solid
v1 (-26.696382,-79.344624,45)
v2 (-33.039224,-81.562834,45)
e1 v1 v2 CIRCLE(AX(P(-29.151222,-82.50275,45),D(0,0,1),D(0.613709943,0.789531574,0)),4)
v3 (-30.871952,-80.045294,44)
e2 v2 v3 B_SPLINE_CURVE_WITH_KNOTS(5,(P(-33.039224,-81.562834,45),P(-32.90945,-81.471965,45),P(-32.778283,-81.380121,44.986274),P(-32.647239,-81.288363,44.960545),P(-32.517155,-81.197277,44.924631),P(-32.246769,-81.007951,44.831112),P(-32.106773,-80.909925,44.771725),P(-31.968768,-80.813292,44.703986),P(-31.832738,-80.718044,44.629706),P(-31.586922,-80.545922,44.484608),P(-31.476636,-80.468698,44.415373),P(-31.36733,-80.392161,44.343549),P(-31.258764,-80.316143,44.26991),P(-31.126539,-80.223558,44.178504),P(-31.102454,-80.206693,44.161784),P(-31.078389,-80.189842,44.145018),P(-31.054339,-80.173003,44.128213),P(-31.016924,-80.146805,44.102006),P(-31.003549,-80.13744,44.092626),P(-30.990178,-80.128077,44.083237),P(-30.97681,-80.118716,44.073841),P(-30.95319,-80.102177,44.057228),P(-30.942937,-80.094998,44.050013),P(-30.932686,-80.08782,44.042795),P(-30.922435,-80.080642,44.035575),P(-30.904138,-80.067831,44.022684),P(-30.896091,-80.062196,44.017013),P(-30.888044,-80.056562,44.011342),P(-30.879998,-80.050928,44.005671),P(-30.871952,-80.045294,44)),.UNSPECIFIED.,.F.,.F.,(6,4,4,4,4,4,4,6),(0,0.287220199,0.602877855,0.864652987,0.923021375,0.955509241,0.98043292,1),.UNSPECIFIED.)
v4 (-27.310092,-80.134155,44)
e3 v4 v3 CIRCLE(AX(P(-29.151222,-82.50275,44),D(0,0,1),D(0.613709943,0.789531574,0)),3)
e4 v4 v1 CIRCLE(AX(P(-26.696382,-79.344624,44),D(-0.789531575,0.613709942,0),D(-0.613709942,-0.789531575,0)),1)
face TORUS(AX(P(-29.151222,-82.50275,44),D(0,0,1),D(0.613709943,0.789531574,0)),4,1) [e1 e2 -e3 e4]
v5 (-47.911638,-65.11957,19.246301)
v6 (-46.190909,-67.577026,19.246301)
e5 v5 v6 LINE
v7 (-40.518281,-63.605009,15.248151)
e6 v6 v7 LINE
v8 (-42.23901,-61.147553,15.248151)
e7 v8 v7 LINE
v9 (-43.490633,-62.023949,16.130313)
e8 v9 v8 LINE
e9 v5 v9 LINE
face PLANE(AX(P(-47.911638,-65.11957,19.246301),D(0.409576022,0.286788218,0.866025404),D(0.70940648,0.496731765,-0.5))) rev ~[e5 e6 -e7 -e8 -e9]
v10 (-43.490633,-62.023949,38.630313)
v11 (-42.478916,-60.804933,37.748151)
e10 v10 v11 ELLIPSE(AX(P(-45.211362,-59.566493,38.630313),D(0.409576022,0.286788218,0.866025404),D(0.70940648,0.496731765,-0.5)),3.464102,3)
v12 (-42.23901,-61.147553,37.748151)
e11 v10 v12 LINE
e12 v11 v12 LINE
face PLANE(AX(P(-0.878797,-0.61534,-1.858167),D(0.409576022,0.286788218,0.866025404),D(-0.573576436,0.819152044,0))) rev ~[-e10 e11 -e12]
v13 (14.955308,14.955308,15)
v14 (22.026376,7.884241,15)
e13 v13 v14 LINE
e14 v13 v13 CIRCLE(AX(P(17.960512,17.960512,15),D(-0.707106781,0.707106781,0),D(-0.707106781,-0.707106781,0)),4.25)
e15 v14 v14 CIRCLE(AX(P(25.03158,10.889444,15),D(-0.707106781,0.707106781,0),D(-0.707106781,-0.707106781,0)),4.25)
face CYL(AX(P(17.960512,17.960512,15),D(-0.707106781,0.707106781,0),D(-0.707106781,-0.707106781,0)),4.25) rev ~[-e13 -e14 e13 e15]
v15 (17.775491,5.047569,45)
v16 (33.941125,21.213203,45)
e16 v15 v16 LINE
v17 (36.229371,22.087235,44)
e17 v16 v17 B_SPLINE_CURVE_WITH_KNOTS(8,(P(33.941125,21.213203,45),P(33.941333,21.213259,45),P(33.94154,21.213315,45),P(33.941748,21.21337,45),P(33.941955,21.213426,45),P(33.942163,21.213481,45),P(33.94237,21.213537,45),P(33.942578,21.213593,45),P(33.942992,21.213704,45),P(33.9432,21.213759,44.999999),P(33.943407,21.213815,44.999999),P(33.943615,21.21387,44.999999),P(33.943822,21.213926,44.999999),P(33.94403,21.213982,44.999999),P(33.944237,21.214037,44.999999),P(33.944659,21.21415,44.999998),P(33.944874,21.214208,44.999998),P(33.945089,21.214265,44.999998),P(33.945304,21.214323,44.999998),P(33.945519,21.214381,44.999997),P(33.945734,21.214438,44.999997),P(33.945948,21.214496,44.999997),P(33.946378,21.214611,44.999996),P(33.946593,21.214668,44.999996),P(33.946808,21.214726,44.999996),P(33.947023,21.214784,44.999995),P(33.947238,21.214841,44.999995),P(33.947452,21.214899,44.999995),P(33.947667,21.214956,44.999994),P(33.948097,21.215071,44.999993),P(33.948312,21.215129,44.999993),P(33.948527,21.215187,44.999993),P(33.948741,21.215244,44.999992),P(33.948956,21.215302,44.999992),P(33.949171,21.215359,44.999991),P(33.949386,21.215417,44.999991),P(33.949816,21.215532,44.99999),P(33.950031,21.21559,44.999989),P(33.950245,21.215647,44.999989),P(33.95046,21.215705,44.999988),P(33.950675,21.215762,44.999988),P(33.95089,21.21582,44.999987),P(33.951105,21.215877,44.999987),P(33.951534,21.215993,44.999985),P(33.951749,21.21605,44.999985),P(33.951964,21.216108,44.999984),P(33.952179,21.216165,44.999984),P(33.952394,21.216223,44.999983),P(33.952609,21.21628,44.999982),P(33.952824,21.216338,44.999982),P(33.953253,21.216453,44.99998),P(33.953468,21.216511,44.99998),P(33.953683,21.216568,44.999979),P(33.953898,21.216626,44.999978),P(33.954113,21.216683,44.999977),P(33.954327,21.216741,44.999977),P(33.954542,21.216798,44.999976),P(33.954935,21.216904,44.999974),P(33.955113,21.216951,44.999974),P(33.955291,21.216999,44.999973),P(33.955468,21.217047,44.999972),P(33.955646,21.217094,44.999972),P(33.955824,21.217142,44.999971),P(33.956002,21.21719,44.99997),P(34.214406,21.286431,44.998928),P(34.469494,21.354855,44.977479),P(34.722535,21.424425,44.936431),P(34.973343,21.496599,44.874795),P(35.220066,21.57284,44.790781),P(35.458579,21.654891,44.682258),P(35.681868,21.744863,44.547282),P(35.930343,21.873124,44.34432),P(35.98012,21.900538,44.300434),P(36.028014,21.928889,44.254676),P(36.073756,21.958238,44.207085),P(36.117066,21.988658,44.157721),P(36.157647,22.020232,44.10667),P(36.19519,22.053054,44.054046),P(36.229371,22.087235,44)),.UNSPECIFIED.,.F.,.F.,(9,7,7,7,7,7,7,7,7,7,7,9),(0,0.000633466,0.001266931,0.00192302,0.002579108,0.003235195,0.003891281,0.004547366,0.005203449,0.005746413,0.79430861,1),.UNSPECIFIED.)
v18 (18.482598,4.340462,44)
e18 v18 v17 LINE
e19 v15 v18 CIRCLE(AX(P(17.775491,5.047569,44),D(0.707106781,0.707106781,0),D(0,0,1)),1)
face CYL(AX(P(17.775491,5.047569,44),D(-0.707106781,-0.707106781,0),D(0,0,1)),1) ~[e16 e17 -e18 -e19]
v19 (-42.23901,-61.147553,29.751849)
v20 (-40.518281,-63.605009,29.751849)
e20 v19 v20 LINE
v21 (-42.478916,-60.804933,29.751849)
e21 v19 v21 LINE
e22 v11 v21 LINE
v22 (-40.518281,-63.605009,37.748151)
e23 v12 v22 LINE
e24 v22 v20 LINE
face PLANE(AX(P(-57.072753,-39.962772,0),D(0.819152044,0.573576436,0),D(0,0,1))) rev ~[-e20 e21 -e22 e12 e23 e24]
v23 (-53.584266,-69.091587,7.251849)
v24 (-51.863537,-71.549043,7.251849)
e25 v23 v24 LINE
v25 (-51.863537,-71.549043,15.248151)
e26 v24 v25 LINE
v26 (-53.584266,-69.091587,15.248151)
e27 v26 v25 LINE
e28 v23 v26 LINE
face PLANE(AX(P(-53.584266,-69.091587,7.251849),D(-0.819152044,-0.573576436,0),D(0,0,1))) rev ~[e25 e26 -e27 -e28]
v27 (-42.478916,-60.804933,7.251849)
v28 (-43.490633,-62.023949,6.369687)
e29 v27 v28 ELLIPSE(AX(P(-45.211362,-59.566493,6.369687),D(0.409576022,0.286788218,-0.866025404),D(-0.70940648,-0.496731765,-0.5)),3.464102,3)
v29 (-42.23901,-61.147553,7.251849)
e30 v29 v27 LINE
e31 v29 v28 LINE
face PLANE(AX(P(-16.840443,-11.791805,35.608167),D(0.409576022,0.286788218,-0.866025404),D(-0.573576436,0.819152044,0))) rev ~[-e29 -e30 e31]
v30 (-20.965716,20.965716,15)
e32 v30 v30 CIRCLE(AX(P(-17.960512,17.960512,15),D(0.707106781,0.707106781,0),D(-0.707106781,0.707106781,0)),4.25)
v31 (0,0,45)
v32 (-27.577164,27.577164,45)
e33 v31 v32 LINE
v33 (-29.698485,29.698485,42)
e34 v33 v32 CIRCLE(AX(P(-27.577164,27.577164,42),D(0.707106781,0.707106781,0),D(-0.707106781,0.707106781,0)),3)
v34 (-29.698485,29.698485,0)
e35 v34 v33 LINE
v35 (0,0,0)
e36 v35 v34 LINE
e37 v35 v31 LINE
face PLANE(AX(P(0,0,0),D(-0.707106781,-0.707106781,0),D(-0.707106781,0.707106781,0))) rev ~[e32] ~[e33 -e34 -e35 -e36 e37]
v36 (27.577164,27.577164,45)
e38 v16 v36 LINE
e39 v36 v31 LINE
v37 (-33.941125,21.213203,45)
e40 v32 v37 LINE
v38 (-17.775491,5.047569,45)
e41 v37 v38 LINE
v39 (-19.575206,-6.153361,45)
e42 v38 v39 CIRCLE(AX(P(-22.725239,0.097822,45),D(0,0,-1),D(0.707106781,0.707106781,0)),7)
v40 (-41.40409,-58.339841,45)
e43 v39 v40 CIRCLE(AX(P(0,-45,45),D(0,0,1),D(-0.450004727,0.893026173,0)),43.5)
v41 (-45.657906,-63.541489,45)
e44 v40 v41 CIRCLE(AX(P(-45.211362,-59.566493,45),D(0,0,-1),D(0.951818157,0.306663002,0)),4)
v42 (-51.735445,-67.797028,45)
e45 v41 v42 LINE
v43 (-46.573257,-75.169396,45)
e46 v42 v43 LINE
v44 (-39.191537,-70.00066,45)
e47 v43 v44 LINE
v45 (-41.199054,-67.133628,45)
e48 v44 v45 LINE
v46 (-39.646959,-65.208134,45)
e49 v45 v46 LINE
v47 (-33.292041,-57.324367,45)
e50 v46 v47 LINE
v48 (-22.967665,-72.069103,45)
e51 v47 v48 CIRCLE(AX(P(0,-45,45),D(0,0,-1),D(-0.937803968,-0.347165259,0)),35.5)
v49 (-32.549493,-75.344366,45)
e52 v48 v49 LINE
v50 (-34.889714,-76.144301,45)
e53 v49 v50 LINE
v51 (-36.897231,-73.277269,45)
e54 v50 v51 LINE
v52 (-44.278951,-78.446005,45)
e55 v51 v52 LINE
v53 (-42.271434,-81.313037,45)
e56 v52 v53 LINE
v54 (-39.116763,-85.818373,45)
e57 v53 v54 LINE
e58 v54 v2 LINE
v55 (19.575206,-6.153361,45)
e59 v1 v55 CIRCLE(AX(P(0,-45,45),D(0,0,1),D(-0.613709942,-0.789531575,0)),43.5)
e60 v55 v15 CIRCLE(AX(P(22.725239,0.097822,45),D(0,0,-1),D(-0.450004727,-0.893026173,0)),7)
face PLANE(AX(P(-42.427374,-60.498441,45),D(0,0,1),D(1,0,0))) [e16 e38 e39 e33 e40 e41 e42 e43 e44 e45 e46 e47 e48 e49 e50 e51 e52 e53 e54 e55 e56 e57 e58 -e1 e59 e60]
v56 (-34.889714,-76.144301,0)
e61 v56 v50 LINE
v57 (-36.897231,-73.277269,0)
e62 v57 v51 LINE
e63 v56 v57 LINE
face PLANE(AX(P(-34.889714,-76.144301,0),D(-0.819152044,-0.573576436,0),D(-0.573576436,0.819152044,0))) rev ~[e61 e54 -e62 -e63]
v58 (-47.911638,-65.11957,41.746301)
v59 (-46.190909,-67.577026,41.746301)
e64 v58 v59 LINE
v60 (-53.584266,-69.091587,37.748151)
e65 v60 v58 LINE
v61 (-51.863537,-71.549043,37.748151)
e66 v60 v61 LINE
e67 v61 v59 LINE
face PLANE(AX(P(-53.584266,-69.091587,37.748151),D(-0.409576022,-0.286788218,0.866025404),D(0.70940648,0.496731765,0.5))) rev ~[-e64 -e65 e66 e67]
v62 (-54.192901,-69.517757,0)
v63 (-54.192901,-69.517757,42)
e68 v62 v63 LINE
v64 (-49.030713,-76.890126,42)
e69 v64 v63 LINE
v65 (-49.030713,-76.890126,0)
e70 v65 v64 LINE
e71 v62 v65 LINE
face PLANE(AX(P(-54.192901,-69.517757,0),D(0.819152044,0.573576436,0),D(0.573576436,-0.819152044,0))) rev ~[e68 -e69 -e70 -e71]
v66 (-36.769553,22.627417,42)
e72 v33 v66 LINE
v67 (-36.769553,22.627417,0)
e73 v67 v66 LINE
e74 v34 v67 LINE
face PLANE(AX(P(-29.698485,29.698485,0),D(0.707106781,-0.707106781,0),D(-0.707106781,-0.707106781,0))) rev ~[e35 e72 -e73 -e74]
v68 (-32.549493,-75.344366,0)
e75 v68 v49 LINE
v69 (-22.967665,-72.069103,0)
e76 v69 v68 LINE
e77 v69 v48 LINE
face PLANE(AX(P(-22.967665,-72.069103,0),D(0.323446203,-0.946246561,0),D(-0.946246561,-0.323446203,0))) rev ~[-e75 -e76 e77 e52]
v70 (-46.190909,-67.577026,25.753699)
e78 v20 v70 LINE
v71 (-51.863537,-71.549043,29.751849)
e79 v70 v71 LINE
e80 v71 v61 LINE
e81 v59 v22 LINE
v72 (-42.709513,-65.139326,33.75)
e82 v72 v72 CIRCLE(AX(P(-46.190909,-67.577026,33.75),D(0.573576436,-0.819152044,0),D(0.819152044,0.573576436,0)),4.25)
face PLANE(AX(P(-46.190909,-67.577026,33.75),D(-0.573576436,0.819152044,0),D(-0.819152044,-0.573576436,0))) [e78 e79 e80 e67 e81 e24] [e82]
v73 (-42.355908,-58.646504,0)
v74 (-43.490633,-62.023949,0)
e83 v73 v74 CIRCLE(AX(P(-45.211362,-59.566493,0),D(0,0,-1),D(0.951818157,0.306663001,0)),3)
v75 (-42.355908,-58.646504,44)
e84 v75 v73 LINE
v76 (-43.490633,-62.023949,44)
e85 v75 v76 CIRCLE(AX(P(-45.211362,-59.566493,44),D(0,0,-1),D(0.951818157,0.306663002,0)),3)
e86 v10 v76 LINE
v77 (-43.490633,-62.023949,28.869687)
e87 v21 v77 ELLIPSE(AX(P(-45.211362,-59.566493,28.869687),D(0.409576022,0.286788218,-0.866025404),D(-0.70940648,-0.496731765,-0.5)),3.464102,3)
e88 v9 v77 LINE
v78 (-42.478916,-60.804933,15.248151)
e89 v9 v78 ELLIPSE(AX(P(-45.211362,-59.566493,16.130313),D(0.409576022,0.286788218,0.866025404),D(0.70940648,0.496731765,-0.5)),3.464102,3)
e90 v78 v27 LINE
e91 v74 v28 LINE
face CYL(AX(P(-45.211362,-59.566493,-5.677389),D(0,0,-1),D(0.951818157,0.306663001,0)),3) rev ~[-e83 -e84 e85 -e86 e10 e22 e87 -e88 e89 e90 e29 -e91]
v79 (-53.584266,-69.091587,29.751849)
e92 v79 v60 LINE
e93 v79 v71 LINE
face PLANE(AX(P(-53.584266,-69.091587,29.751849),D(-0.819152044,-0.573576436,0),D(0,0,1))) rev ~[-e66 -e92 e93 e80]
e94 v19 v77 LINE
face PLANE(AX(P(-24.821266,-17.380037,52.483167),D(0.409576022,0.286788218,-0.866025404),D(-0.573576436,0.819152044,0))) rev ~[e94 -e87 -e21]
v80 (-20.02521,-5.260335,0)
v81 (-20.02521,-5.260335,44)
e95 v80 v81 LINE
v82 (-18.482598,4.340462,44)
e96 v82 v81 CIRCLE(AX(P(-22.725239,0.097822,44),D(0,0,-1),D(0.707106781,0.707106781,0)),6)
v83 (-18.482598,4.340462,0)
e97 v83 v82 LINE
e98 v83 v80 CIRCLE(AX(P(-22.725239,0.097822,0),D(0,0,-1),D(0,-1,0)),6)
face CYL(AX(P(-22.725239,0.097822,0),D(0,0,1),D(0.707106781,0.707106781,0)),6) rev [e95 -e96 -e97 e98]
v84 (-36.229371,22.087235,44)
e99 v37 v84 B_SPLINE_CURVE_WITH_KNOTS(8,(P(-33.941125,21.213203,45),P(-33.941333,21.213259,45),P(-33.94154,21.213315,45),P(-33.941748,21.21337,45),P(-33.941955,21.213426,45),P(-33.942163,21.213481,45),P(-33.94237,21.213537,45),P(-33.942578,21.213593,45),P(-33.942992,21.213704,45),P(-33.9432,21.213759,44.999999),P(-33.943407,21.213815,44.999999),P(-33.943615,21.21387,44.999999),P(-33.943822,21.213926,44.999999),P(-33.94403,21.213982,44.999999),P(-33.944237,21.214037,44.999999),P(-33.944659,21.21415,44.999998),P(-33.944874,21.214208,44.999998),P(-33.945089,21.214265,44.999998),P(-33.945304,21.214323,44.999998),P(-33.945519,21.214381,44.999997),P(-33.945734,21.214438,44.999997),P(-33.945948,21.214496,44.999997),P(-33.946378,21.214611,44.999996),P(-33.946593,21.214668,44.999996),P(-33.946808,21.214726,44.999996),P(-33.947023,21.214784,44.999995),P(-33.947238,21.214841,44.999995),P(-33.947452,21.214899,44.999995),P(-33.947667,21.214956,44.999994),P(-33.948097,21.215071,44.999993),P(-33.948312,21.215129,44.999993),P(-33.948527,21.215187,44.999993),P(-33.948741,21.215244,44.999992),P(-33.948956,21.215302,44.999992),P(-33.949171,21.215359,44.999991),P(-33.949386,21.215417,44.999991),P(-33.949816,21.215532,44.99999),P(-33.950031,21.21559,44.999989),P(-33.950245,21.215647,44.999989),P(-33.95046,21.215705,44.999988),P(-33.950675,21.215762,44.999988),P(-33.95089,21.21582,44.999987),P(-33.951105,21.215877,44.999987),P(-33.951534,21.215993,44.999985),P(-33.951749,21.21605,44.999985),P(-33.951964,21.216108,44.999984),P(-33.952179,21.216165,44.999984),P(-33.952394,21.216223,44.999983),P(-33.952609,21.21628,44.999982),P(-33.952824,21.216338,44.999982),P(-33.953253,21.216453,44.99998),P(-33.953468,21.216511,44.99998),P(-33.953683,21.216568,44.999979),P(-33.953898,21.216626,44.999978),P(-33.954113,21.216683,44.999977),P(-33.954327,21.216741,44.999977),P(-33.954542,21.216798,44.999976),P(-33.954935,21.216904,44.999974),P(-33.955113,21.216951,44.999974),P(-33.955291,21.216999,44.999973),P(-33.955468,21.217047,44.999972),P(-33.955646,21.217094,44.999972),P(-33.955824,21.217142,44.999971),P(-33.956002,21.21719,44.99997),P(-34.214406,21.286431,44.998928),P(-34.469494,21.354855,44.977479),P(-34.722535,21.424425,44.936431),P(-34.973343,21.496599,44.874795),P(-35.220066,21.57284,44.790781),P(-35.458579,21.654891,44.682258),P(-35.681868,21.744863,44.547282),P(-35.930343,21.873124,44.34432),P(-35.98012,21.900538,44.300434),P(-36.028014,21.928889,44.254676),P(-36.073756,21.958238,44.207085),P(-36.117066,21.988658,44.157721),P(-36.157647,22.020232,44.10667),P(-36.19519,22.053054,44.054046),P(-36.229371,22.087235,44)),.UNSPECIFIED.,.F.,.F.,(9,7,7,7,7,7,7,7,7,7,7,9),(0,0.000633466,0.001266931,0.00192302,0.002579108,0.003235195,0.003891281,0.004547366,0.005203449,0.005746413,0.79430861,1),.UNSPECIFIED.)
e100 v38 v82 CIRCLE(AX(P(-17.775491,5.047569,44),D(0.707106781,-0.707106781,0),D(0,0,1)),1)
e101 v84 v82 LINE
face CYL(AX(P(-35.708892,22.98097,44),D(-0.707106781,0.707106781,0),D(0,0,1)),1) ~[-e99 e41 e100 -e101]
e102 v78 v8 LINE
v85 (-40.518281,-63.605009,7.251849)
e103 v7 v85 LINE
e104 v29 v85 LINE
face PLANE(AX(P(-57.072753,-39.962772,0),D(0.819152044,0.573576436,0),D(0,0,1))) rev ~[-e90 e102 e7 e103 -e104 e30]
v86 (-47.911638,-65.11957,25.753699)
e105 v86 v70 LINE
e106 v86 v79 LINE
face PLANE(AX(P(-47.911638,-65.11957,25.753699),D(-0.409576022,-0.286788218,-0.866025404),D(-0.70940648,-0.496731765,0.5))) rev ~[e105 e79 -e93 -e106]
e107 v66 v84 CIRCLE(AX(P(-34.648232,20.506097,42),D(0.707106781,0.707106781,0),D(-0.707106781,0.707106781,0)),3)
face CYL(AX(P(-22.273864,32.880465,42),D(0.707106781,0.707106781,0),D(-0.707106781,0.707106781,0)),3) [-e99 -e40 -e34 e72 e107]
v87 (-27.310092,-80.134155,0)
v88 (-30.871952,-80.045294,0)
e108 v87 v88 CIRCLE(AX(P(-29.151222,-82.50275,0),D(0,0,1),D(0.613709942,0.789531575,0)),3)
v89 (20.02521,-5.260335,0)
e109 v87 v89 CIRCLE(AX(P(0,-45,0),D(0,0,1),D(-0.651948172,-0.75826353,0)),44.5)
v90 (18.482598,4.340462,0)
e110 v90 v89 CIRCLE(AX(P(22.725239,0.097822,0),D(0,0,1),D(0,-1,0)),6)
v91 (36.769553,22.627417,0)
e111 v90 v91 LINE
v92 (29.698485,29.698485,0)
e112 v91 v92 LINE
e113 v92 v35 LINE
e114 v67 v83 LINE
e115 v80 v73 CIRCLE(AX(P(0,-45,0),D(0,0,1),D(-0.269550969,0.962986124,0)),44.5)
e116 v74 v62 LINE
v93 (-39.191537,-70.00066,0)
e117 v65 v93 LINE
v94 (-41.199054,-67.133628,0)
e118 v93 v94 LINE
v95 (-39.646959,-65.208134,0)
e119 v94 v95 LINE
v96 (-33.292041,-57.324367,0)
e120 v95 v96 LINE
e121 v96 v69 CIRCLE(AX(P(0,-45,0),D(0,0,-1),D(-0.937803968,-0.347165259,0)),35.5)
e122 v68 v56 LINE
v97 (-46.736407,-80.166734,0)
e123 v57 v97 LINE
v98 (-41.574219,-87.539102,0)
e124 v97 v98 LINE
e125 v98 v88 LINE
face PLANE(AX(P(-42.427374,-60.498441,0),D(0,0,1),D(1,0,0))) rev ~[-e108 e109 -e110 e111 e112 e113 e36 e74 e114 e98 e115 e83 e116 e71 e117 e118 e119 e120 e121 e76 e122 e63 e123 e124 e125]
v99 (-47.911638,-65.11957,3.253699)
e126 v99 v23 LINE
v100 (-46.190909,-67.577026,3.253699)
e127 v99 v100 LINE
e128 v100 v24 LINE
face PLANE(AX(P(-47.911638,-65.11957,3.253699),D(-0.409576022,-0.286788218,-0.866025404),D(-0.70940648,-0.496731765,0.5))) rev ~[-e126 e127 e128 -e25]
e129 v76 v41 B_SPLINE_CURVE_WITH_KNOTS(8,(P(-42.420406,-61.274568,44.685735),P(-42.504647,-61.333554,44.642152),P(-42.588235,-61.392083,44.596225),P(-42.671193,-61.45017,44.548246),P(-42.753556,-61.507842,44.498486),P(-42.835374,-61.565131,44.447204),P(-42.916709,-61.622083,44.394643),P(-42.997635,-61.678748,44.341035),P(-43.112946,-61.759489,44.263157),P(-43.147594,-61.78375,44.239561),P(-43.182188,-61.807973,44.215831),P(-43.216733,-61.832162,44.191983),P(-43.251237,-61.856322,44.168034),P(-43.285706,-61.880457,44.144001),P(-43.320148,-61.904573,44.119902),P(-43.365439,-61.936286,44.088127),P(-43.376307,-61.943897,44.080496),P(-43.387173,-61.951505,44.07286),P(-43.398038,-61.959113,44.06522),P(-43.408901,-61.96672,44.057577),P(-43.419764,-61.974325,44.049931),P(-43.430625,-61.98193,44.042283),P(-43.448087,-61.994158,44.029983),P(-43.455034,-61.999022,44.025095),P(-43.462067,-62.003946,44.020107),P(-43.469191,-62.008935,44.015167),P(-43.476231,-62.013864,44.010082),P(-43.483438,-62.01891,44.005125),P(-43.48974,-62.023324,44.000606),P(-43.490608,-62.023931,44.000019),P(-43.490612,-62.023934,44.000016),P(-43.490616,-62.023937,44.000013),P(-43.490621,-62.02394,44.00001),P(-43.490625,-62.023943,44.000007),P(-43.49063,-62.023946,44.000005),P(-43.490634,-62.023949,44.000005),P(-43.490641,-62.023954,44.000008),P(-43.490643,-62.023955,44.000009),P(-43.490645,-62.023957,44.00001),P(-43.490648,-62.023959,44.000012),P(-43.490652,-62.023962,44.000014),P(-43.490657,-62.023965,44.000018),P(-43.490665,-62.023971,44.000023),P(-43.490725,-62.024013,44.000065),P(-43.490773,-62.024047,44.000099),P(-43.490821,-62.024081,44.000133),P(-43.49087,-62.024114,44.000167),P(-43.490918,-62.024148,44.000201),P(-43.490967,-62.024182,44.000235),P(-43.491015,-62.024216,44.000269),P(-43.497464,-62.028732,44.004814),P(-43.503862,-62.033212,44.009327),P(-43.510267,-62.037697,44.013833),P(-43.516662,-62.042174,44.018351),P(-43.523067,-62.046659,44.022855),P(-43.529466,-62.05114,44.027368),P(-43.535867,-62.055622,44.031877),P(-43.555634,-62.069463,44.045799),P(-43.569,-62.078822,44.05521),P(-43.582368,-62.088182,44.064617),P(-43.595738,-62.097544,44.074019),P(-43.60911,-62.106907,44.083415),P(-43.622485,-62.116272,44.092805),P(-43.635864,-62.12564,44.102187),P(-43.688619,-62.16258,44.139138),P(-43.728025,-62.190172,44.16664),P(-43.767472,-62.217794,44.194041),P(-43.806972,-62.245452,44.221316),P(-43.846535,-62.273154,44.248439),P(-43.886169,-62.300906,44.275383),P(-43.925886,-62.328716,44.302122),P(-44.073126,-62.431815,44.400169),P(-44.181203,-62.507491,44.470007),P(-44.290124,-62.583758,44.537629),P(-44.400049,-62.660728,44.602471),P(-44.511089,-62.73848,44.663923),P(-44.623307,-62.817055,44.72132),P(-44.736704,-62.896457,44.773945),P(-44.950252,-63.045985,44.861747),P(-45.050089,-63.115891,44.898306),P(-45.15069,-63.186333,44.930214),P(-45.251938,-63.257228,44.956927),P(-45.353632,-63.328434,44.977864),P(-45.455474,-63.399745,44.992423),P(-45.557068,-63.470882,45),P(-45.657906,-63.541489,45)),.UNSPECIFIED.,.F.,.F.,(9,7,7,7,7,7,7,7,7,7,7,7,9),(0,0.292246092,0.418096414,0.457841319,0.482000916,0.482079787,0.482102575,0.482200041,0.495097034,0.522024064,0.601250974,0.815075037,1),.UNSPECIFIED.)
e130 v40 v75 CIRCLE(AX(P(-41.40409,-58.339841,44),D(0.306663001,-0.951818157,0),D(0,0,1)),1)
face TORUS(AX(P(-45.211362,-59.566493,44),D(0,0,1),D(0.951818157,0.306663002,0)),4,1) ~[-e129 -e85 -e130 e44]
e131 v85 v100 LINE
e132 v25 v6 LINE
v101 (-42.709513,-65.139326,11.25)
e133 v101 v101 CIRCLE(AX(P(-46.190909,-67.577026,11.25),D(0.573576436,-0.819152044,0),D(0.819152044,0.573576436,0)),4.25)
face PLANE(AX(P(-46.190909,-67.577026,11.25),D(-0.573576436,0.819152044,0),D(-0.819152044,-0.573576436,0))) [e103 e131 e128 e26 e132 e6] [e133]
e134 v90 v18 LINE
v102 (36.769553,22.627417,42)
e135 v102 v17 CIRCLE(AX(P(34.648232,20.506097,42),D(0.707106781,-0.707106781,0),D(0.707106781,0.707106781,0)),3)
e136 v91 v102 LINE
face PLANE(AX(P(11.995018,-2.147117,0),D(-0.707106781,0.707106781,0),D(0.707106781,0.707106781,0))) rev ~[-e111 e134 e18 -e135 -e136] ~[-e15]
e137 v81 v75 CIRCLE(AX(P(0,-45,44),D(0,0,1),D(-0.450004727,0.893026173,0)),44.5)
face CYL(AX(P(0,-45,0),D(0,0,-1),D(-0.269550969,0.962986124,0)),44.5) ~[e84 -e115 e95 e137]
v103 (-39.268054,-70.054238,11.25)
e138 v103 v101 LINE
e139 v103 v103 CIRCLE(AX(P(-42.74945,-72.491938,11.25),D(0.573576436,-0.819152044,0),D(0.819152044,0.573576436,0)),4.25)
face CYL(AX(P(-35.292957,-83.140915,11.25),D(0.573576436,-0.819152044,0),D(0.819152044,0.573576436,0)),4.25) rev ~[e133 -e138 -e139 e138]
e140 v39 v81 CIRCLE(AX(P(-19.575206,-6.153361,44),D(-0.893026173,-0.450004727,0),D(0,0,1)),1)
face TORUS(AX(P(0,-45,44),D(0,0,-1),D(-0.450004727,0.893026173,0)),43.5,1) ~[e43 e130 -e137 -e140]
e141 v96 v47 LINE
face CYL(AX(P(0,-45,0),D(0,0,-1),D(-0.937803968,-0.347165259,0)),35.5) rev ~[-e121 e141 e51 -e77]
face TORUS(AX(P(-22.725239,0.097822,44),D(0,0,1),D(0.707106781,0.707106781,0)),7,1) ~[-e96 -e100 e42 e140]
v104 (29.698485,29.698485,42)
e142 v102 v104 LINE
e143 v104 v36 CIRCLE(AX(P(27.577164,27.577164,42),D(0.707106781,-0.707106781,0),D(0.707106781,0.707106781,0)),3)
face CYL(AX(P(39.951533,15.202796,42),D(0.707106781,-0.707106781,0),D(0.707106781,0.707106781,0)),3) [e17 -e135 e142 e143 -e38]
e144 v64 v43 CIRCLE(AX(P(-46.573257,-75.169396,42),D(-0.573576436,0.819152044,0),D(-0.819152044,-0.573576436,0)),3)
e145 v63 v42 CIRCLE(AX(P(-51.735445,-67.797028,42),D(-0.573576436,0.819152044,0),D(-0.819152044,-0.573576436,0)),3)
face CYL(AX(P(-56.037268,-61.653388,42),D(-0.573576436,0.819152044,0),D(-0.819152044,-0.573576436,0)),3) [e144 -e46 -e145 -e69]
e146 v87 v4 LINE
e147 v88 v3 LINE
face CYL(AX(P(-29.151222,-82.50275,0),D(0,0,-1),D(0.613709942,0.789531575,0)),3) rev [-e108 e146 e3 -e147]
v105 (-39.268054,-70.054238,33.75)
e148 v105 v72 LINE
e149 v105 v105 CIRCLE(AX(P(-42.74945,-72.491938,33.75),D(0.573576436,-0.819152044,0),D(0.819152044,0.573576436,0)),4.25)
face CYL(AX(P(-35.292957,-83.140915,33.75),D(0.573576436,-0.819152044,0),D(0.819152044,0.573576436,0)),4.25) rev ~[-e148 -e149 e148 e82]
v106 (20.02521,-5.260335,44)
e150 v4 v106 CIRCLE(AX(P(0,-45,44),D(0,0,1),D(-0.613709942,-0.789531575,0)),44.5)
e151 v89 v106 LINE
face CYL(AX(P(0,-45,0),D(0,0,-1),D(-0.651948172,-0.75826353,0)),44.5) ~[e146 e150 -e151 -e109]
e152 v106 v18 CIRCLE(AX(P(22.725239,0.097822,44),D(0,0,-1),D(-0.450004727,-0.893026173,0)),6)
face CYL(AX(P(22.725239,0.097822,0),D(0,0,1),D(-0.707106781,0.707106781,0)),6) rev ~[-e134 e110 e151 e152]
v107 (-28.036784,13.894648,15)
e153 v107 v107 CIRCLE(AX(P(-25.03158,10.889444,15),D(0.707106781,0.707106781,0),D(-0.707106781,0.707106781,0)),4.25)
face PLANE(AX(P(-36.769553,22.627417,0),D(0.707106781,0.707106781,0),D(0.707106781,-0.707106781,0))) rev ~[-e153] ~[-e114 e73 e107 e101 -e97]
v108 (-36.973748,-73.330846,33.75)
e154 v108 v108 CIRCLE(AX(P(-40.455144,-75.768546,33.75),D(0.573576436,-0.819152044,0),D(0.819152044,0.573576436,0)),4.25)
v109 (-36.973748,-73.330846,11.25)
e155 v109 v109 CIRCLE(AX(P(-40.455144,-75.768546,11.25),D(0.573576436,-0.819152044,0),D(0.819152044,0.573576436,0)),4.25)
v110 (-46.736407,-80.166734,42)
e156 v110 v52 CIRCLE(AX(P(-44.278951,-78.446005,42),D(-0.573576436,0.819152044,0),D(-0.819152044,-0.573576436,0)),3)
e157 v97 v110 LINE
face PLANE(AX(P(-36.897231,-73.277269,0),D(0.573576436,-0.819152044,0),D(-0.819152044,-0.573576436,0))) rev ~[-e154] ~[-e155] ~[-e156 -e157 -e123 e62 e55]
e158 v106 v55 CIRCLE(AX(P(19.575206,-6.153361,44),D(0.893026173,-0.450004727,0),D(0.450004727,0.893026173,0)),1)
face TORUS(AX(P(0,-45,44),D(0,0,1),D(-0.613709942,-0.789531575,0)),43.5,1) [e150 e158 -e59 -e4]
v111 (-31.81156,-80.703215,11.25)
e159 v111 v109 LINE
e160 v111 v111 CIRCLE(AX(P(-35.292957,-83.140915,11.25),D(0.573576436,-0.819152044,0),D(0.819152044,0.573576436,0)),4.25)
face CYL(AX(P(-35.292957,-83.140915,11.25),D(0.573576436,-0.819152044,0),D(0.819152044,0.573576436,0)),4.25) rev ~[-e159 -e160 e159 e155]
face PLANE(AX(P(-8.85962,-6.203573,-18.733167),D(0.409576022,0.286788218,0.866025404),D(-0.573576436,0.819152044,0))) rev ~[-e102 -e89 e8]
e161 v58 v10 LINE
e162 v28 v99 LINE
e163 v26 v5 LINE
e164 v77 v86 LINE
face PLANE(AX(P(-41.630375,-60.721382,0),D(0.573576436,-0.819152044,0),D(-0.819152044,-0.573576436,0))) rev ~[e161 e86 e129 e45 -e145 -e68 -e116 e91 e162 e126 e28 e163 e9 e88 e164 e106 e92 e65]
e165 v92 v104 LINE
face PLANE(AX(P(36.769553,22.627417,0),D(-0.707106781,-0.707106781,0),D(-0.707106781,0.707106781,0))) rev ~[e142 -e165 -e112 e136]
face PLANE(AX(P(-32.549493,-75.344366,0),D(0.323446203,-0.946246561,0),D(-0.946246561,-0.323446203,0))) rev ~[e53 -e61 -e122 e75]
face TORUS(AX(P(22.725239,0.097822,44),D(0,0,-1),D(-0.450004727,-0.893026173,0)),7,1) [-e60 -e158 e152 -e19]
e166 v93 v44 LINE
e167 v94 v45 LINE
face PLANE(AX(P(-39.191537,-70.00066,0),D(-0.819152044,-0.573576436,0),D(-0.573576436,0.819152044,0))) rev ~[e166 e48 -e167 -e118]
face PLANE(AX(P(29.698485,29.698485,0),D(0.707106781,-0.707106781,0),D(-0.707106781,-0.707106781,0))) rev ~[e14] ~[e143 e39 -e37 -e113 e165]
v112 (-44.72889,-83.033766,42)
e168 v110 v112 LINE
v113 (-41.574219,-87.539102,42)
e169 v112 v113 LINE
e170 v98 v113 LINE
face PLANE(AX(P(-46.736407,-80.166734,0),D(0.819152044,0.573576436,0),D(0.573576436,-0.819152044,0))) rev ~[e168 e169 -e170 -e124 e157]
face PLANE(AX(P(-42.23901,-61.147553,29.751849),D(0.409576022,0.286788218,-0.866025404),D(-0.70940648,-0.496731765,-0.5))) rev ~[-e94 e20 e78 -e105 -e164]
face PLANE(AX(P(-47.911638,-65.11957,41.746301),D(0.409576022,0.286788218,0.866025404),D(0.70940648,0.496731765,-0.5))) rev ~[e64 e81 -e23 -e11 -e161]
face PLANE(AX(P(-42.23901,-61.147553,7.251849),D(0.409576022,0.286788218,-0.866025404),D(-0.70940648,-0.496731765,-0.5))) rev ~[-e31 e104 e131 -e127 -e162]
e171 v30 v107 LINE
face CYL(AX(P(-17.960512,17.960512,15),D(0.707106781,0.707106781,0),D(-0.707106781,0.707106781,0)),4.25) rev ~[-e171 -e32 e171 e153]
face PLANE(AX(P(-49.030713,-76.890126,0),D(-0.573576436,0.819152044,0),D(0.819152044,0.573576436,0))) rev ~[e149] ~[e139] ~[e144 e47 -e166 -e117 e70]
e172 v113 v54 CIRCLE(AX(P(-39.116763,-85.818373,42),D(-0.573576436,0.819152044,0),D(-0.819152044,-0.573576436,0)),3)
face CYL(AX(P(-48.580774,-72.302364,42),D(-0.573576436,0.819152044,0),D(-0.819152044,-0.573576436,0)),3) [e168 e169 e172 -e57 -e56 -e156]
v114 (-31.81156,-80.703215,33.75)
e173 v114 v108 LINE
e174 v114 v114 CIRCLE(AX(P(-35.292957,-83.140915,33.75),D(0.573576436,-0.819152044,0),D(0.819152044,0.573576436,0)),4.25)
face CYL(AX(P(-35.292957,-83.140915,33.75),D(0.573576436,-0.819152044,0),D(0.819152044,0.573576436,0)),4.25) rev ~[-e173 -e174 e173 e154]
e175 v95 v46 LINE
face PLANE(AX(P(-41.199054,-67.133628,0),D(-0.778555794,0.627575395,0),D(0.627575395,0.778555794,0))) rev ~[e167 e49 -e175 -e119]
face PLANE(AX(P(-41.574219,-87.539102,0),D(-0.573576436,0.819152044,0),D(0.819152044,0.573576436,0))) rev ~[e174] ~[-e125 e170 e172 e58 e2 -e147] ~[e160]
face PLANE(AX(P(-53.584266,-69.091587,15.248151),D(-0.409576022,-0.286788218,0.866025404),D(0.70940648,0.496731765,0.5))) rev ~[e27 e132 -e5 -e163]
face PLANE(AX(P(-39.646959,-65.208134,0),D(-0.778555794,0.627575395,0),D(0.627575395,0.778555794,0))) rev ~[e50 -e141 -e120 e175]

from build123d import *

# Parameters (mm, degrees)
F1_DEPTH      = 45
F2_R          = 4.25
F3_DEPTH      = 10
F4_R          = 4.25
F5_DEPTH      = 10
F6_R          = 4.25
F7_DEPTH      = 22
F9_DEPTH      = 3
F10_R         = 6
F11_T1_DEPTH  = 45
F11_T6_DEPTH  = 45
F11_T11_DEPTH = 50.6773888561
F11_T16_DEPTH = 56.3547777122
F11_T22_DEPTH = 50.6773888561
F11_T24_DEPTH = 24
F11_T26_DEPTH = 24
F11_T28_DEPTH = 25
F11_T30_DEPTH = 25
F12_T3_ANGLE  = 191.1142548037
F12_T6_ANGLE  = 120.6172934525
F12_T9_ANGLE  = 108.2560127517
F12_T12_DEPTH = 25.3616591831
F12_T15_DEPTH = 25.3616591831
F12_T18_ANGLE = 108.2560127517
F12_T21_ANGLE = 120.6172934336
F12_T24_ANGLE = 81.1142548036


# Not quite as in the source:
# - a fillet or chamfer that OpenCascade refuses, or shapes differently, is made with other operations: its cross-section is extruded or revolved along the edge and cut away or added


with BuildPart() as f1:
    # F0 (on Top) → F1 (new body)
    with BuildSketch(Plane.XY):
        with BuildLine():
            Line((29.6984848098, 29.6984848098), (0, 0))
            Line((0, 0), (-29.6984848098, 29.6984848098))
            Line((-29.6984848098, 29.6984848098), (-36.7695526217, 22.627416998))
            Line((-36.7695526217, 22.627416998), (-11.9950181388, -2.1471174849))
            ThreePointArc((-11.9950181388, -2.1471174849), (-39.7071381913, -24.9103714156), (-41.6303752657, -60.7213821032))
            ThreePointArc((-41.6303752657, -60.7213821032), (-40.7005404194, -62.9921096474), (-39.6469587391, -65.2081335788))
            Line((-39.6469587391, -65.2081335788), (-33.2920408775, -57.324366686))
            ThreePointArc((-33.2920408775, -57.324366686), (29.0798975723, -24.6380365095), (-22.9676650232, -72.0691034832))
            Line((-22.9676650232, -72.0691034832), (-32.5494925143, -75.3443658208))
            ThreePointArc((-32.5494925143, -75.3443658208), (-30.8274573358, -77.0923335738), (-29.011693666, -78.7427270775))
            ThreePointArc((-29.011693666, -78.7427270775), (39.2315391454, -66.0032458512), (11.9950181388, -2.1471174849))
            Line((11.9950181388, -2.1471174849), (36.7695526217, 22.627416998))
            Line((36.7695526217, 22.627416998), (29.6984848098, 29.6984848098))
        make_face()
        with BuildLine():
            ThreePointArc((-39.6469587391, -65.2081335788), (-40.7005404194, -62.9921096474), (-41.6303752657, -60.7213821032))
            Line((-41.6303752657, -60.7213821032), (-54.1929009582, -69.517757292))
            Line((-54.1929009582, -69.517757292), (-49.0307130311, -76.8901256906))
            Line((-49.0307130311, -76.8901256906), (-39.1915368437, -70.0006603545))
            Line((-39.1915368437, -70.0006603545), (-41.1990543709, -67.1336281995))
            Line((-41.1990543709, -67.1336281995), (-39.6469587391, -65.2081335788))
        make_face()
        with BuildLine():
            Line((-41.5742193585, -87.5391022664), (-29.011693666, -78.7427270775))
            ThreePointArc((-29.011693666, -78.7427270775), (-30.8274573358, -77.0923335738), (-32.5494925143, -75.3443658208))
            Line((-32.5494925143, -75.3443658208), (-34.8897135711, -76.1443006866))
            Line((-34.8897135711, -76.1443006866), (-36.8972310983, -73.2772685316))
            Line((-36.8972310983, -73.2772685316), (-46.7364072857, -80.1667338678))
            Line((-46.7364072857, -80.1667338678), (-41.5742193585, -87.5391022664))
        make_face()
    extrude(amount=F1_DEPTH)

    # F2 (on face) → F3 (cut, through all)
    with BuildSketch(Plane(origin=(0, 0, 0), x_dir=(-0.7071067812, -0.7071067812, 0), z_dir=(-0.7071067812, 0.7071067812, 0))):
        with Locations((-25.4, 15)):
            Circle(F2_R)
    extrude(amount=-F3_DEPTH, mode=Mode.SUBTRACT)

    # F4 (on face) → F5 (cut, through all)
    with BuildSketch(Plane(origin=(0, 0, 0), x_dir=(-0.7071067812, 0.7071067812, 0), z_dir=(0.7071067812, 0.7071067812, 0))):
        with Locations((25.4, 15)):
            Circle(F4_R)
    extrude(amount=-F5_DEPTH, mode=Mode.SUBTRACT)

    # F6 (on face) → F7 (cut, through all)
    with BuildSketch(Plane(origin=(27.4524247675, -39.206125712, 0), x_dir=(0.8191520443, 0.5735764364, 0), z_dir=(0.5735764364, -0.8191520443, 0))):
        with Locations((-76.5979670285, 33.75)):
            Circle(F6_R)
        with Locations((-76.5979670285, 11.25)):
            Circle(F6_R)
    extrude(amount=-F7_DEPTH, mode=Mode.SUBTRACT)

    # F8 (on face) → F9 (cut)
    with BuildSketch(Plane(origin=(14.8337431678, -21.1847807376, 0), x_dir=(-0.8191520443, -0.5735764364, 0), z_dir=(-0.5735764364, 0.8191520443, 0))):
        Polygon((83.5229670285, 37.7481506141), (76.5979670285, 41.7463012283), (69.6729670285, 37.7481506141), (69.6729670285, 29.7518493859), (76.5979670285, 25.7536987717), (83.5229670285, 29.7518493859), align=None)
        Polygon((76.5979670285, 19.2463012283), (69.6729670285, 15.2481506141), (69.6729670285, 7.2518493859), (76.5979670285, 3.2536987717), (83.5229670285, 7.2518493859), (83.5229670285, 15.2481506141), align=None)
    extrude(amount=-F9_DEPTH, mode=Mode.SUBTRACT)

    # F10
    f10_edges = [f1.edges().sort_by_distance(p)[0] for p in [
        (-11.995018, -2.147117, 22.5),
        (11.995018, -2.147117, 22.5),
    ]]
    fillet(f10_edges, radius=F10_R)

    # F11: fillet of radius 3 on 6 edges, made by hand

    # F11_s2 → F11_t1 (join)
    with BuildSketch(Plane.XY):
        with BuildLine():
            ThreePointArc((-27.3100924069, -80.1341550735), (-29.0764013889, -79.5036829691), (-30.8719515411, -80.0452936647))
            Line((-30.8719515411, -80.0452936647), (-29.011693666, -78.7427270775))
            ThreePointArc((-29.011693666, -78.7427270775), (-28.169485522, -79.4489489742), (-27.3100924069, -80.1341550735))
        make_face()
    extrude(amount=F11_T1_DEPTH)


with BuildPart() as f11_tool4:
    # F11_s5 → F11_t6 (new body)
    with BuildSketch(Plane.XY):
        with BuildLine():
            ThreePointArc((-42.3559079793, -58.6465035538), (-42.3675712465, -60.5219252298), (-43.4906331408, -62.0239486903))
            Line((-43.4906331408, -62.0239486903), (-41.6303752657, -60.7213821032))
            ThreePointArc((-41.6303752657, -60.7213821032), (-42.0059546205, -59.6884232108), (-42.3559079793, -58.6465035538))
        make_face()
    extrude(amount=F11_T6_DEPTH)

    split(bisect_by=Plane(origin=(-57.0727533731, -39.9627721382, 0), x_dir=(0, 0, 1), z_dir=(0.8191520443, 0.5735764364, 0)), keep=Keep.TOP)


with BuildPart() as f1_1:
    add(f1.part)

    # F11_t3: union F11_tool4
    add(f11_tool4.part)


with BuildPart() as f11_tool9:
    # F11_s10 → F11_t11 (new body)
    with BuildSketch(Plane.XY):
        with BuildLine():
            ThreePointArc((-42.3559079793, -58.6465035538), (-42.3675712465, -60.5219252298), (-43.4906331408, -62.0239486903))
            Line((-43.4906331408, -62.0239486903), (-41.6303752657, -60.7213821032))
            ThreePointArc((-41.6303752657, -60.7213821032), (-42.0059546205, -59.6884232108), (-42.3559079793, -58.6465035538))
        make_face()
    extrude(amount=F11_T11_DEPTH)

    split(bisect_by=Plane(origin=(-16.8404428161, -11.7918050066, 35.6081667412), x_dir=(-0.5735764364, 0.8191520443, 0), z_dir=(0.4095760221, 0.2867882182, -0.8660254038)), keep=Keep.TOP)


with BuildPart() as f1_2:
    add(f1_1.part)

    # F11_t8: union F11_tool9
    add(f11_tool9.part)


with BuildPart() as f11_tool14:
    # F11_s15 → F11_t16 (new body)
    with BuildSketch(Plane.XY.offset(-5.6773888561)):
        with BuildLine():
            ThreePointArc((-42.3559079793, -58.6465035538), (-42.3675712465, -60.5219252298), (-43.4906331408, -62.0239486903))
            Line((-43.4906331408, -62.0239486903), (-41.6303752657, -60.7213821032))
            ThreePointArc((-41.6303752657, -60.7213821032), (-42.0059546205, -59.6884232108), (-42.3559079793, -58.6465035538))
        make_face()
    extrude(amount=F11_T16_DEPTH)

    split(bisect_by=Plane(origin=(-24.8212657152, -17.3800373617, 52.4831667412), x_dir=(-0.5735764364, 0.8191520443, 0), z_dir=(0.4095760221, 0.2867882182, -0.8660254038)), keep=Keep.TOP)

    split(bisect_by=Plane(origin=(-8.8596199171, -6.2035726516, -18.7331667412), x_dir=(-0.5735764364, 0.8191520443, 0), z_dir=(0.4095760221, 0.2867882182, 0.8660254038)), keep=Keep.TOP)


with BuildPart() as f1_3:
    add(f1_2.part)

    # F11_t13: union F11_tool14
    add(f11_tool14.part)


with BuildPart() as f11_tool20:
    # F11_s21 → F11_t22 (new body)
    with BuildSketch(Plane.XY.offset(-5.6773888561)):
        with BuildLine():
            ThreePointArc((-42.3559079793, -58.6465035538), (-42.3675712465, -60.5219252298), (-43.4906331408, -62.0239486903))
            Line((-43.4906331408, -62.0239486903), (-41.6303752657, -60.7213821032))
            ThreePointArc((-41.6303752657, -60.7213821032), (-42.0059546205, -59.6884232108), (-42.3559079793, -58.6465035538))
        make_face()
    extrude(amount=F11_T22_DEPTH)

    split(bisect_by=Plane(origin=(-0.878797018, -0.6153402966, -1.8581667412), x_dir=(-0.5735764364, 0.8191520443, 0), z_dir=(0.4095760221, 0.2867882182, 0.8660254038)), keep=Keep.TOP)


with BuildPart() as f1_4:
    add(f1_3.part)

    # F11_t19: union F11_tool20
    add(f11_tool20.part)

    # F11_s25 → F11_t24 (cut)
    with BuildSketch(Plane(origin=(10.5319198952, -15.0411404055, 0), x_dir=(0, 0, 1), z_dir=(0.5735764364, -0.8191520443, 0))):
        with BuildLine():
            ThreePointArc((42, 84.2659730966), (44.1213203436, 83.3872934401), (45, 81.2659730966))
            Line((45, 81.2659730966), (45, 84.2659730966))
            Line((45, 84.2659730966), (42, 84.2659730966))
        make_face()
    extrude(amount=F11_T24_DEPTH, mode=Mode.SUBTRACT)

    # F11_s27 → F11_t26 (cut)
    with BuildSketch(Plane(origin=(17.9884135678, -25.6901169812, 0), x_dir=(0, 0, 1), z_dir=(0.5735764364, -0.8191520443, 0))):
        with BuildLine():
            ThreePointArc((42, 84.2659730966), (44.1213203436, 83.3872934401), (45, 81.2659730966))
            Line((45, 81.2659730966), (45, 84.2659730966))
            Line((45, 84.2659730966), (42, 84.2659730966))
        make_face()
    extrude(amount=F11_T26_DEPTH, mode=Mode.SUBTRACT)

    # F11_s29 → F11_t28 (cut)
    with BuildSketch(Plane(origin=(5.3033008589, 5.3033008589, 0), x_dir=(0, 0, 1), z_dir=(-0.7071067812, -0.7071067812, 0))):
        with BuildLine():
            ThreePointArc((42, 42), (44.1213203436, 41.1213203436), (45, 39))
            Line((45, 39), (45, 42))
            Line((45, 42), (42, 42))
        make_face()
    extrude(amount=F11_T28_DEPTH, mode=Mode.SUBTRACT)

    # F11_s31 → F11_t30 (cut)
    with BuildSketch(Plane(origin=(12.3743686708, -12.3743686708, 0), x_dir=(0, 0, 1), z_dir=(-0.7071067812, 0.7071067812, 0))):
        with BuildLine():
            ThreePointArc((42, 42), (44.1213203436, 41.1213203436), (45, 39))
            Line((45, 39), (45, 42))
            Line((45, 42), (42, 42))
        make_face()
    extrude(amount=F11_T30_DEPTH, mode=Mode.SUBTRACT)

    # F12: fillet of radius 1 on 8 edges, made by hand


with BuildPart() as f12_tool1:
    # F12_s2 → F12_t3 (revolve)
    with BuildSketch(Plane(origin=(21.8044519511, -16.9487951659, 0), x_dir=(0, 0, 1), z_dir=(-0.7895315747, 0.6137099417, 0))):
        with BuildLine():
            ThreePointArc((44, -80.0289208608), (44.7071067812, -79.736027642), (45, -79.0289208608))
            Line((45, -79.0289208608), (45, -80.0289208608))
            Line((45, -80.0289208608), (44, -80.0289208608))
        make_face()
    revolve(axis=Axis((0, -45, 45), (0, 0, 1)), revolution_arc=F12_T3_ANGLE)


with BuildPart() as f12_tool4:
    # F12_s5 → F12_t6 (revolve)
    with BuildSketch(Plane(origin=(21.8044519524, -16.9487951679, 0), x_dir=(0, 0, 1), z_dir=(0.7895315747, -0.6137099417, 0))):
        with BuildLine():
            ThreePointArc((45, 79.0289208601), (44.7071067812, 79.7360276413), (44, 80.0289208601))
            Line((44, 80.0289208601), (45, 80.0289208601))
            Line((45, 80.0289208601), (45, 79.0289208601))
        make_face()
    revolve(axis=Axis((-29.1512222321, -82.5027497974, 45), (0, 0, 1)), revolution_arc=F12_T6_ANGLE)


with BuildPart() as f12_tool7:
    # F12_s8 → F12_t9 (revolve)
    with BuildSketch(Plane(origin=(-11.4115302287, 11.4115302287, 0), x_dir=(0, 0, 1), z_dir=(-0.7071067812, 0.7071067812, 0))):
        with BuildLine():
            ThreePointArc((45, -9), (44.7071067812, -9.7071067812), (44, -10))
            Line((44, -10), (45, -10))
            Line((45, -10), (45, -9))
        make_face()
    revolve(axis=Axis((-22.7252387277, 0.0978217297, 45), (0, 0, -1)), revolution_arc=F12_T9_ANGLE)


with BuildPart() as f12_tool10:
    # F12_s11 → F12_t12 (new body)
    with BuildSketch(Plane(origin=(-29.3449314192, 29.3449314192, 0), x_dir=(0, 0, 1), z_dir=(0.7071067812, -0.7071067812, 0))):
        with BuildLine():
            ThreePointArc((45, 9), (44.7071067812, 9.7071067812), (44, 10))
            Line((44, 10), (45, 10))
            Line((45, 10), (45, 9))
        make_face()
    extrude(amount=F12_T12_DEPTH)


with BuildPart() as f12_tool13:
    # F12_s14 → F12_t15 (new body)
    with BuildSketch(Plane(origin=(11.4115302287, 11.4115302287, 0), x_dir=(0, 0, 1), z_dir=(0.7071067812, 0.7071067812, 0))):
        with BuildLine():
            ThreePointArc((45, 9), (44.7071067812, 9.7071067812), (44, 10))
            Line((44, 10), (45, 10))
            Line((45, 10), (45, 9))
        make_face()
    extrude(amount=F12_T15_DEPTH)


with BuildPart() as f12_tool16:
    # F12_s17 → F12_t18 (revolve)
    with BuildSketch(Plane(origin=(18.0839699719, -9.1126914559, 0), x_dir=(0, 0, 1), z_dir=(0.8930261729, -0.4500047273, 0))):
        with BuildLine():
            ThreePointArc((44, -4.313822221), (44.7071067812, -4.0209290022), (45, -3.313822221))
            Line((45, -3.313822221), (45, -4.313822221))
            Line((45, -4.313822221), (44, -4.313822221))
        make_face()
    revolve(axis=Axis((22.7252387277, 0.0978217298, 45), (0, 0, -1)), revolution_arc=F12_T18_ANGLE)


with BuildPart() as f12_tool19:
    # F12_s20 → F12_t21 (revolve)
    with BuildSketch(Plane(origin=(13.1349335644, -40.7681011714, 0), x_dir=(0, 0, 1), z_dir=(-0.3066630011, 0.9518181569, 0))):
        with BuildLine():
            ThreePointArc((45, -57.299835051), (44.7071067812, -58.0069418322), (44, -58.299835051))
            Line((44, -58.299835051), (45, -58.299835051))
            Line((45, -58.299835051), (45, -57.299835051))
        make_face()
    revolve(axis=Axis((-45.2113624502, -59.5664925573, 45), (0, 0, -1)), revolution_arc=F12_T21_ANGLE)


with BuildPart() as f12_tool22:
    # F12_s23 → F12_t24 (revolve)
    with BuildSketch(Plane(origin=(-18.0839699719, -9.1126914559, 0), x_dir=(0, 0, 1), z_dir=(0.8930261729, 0.4500047273, 0))):
        with BuildLine():
            ThreePointArc((45, -3.313822221), (44.7071067812, -4.0209290022), (44, -4.313822221))
            Line((44, -4.313822221), (45, -4.313822221))
            Line((45, -4.313822221), (45, -3.313822221))
        make_face()
    revolve(axis=Axis((0, -45, 45), (0, 0, 1)), revolution_arc=F12_T24_ANGLE)


with BuildPart() as f1_5:
    add(f1_4.part)

    # F12_t25: cut F12_tool1, F12_tool4, F12_tool7, F12_tool10, F12_tool13, F12_tool16, F12_tool19, F12_tool22
    add([f12_tool1.part, f12_tool4.part, f12_tool7.part, f12_tool10.part, f12_tool13.part, f12_tool16.part, f12_tool19.part, f12_tool22.part], mode=Mode.SUBTRACT)


solid = f1_5.part
